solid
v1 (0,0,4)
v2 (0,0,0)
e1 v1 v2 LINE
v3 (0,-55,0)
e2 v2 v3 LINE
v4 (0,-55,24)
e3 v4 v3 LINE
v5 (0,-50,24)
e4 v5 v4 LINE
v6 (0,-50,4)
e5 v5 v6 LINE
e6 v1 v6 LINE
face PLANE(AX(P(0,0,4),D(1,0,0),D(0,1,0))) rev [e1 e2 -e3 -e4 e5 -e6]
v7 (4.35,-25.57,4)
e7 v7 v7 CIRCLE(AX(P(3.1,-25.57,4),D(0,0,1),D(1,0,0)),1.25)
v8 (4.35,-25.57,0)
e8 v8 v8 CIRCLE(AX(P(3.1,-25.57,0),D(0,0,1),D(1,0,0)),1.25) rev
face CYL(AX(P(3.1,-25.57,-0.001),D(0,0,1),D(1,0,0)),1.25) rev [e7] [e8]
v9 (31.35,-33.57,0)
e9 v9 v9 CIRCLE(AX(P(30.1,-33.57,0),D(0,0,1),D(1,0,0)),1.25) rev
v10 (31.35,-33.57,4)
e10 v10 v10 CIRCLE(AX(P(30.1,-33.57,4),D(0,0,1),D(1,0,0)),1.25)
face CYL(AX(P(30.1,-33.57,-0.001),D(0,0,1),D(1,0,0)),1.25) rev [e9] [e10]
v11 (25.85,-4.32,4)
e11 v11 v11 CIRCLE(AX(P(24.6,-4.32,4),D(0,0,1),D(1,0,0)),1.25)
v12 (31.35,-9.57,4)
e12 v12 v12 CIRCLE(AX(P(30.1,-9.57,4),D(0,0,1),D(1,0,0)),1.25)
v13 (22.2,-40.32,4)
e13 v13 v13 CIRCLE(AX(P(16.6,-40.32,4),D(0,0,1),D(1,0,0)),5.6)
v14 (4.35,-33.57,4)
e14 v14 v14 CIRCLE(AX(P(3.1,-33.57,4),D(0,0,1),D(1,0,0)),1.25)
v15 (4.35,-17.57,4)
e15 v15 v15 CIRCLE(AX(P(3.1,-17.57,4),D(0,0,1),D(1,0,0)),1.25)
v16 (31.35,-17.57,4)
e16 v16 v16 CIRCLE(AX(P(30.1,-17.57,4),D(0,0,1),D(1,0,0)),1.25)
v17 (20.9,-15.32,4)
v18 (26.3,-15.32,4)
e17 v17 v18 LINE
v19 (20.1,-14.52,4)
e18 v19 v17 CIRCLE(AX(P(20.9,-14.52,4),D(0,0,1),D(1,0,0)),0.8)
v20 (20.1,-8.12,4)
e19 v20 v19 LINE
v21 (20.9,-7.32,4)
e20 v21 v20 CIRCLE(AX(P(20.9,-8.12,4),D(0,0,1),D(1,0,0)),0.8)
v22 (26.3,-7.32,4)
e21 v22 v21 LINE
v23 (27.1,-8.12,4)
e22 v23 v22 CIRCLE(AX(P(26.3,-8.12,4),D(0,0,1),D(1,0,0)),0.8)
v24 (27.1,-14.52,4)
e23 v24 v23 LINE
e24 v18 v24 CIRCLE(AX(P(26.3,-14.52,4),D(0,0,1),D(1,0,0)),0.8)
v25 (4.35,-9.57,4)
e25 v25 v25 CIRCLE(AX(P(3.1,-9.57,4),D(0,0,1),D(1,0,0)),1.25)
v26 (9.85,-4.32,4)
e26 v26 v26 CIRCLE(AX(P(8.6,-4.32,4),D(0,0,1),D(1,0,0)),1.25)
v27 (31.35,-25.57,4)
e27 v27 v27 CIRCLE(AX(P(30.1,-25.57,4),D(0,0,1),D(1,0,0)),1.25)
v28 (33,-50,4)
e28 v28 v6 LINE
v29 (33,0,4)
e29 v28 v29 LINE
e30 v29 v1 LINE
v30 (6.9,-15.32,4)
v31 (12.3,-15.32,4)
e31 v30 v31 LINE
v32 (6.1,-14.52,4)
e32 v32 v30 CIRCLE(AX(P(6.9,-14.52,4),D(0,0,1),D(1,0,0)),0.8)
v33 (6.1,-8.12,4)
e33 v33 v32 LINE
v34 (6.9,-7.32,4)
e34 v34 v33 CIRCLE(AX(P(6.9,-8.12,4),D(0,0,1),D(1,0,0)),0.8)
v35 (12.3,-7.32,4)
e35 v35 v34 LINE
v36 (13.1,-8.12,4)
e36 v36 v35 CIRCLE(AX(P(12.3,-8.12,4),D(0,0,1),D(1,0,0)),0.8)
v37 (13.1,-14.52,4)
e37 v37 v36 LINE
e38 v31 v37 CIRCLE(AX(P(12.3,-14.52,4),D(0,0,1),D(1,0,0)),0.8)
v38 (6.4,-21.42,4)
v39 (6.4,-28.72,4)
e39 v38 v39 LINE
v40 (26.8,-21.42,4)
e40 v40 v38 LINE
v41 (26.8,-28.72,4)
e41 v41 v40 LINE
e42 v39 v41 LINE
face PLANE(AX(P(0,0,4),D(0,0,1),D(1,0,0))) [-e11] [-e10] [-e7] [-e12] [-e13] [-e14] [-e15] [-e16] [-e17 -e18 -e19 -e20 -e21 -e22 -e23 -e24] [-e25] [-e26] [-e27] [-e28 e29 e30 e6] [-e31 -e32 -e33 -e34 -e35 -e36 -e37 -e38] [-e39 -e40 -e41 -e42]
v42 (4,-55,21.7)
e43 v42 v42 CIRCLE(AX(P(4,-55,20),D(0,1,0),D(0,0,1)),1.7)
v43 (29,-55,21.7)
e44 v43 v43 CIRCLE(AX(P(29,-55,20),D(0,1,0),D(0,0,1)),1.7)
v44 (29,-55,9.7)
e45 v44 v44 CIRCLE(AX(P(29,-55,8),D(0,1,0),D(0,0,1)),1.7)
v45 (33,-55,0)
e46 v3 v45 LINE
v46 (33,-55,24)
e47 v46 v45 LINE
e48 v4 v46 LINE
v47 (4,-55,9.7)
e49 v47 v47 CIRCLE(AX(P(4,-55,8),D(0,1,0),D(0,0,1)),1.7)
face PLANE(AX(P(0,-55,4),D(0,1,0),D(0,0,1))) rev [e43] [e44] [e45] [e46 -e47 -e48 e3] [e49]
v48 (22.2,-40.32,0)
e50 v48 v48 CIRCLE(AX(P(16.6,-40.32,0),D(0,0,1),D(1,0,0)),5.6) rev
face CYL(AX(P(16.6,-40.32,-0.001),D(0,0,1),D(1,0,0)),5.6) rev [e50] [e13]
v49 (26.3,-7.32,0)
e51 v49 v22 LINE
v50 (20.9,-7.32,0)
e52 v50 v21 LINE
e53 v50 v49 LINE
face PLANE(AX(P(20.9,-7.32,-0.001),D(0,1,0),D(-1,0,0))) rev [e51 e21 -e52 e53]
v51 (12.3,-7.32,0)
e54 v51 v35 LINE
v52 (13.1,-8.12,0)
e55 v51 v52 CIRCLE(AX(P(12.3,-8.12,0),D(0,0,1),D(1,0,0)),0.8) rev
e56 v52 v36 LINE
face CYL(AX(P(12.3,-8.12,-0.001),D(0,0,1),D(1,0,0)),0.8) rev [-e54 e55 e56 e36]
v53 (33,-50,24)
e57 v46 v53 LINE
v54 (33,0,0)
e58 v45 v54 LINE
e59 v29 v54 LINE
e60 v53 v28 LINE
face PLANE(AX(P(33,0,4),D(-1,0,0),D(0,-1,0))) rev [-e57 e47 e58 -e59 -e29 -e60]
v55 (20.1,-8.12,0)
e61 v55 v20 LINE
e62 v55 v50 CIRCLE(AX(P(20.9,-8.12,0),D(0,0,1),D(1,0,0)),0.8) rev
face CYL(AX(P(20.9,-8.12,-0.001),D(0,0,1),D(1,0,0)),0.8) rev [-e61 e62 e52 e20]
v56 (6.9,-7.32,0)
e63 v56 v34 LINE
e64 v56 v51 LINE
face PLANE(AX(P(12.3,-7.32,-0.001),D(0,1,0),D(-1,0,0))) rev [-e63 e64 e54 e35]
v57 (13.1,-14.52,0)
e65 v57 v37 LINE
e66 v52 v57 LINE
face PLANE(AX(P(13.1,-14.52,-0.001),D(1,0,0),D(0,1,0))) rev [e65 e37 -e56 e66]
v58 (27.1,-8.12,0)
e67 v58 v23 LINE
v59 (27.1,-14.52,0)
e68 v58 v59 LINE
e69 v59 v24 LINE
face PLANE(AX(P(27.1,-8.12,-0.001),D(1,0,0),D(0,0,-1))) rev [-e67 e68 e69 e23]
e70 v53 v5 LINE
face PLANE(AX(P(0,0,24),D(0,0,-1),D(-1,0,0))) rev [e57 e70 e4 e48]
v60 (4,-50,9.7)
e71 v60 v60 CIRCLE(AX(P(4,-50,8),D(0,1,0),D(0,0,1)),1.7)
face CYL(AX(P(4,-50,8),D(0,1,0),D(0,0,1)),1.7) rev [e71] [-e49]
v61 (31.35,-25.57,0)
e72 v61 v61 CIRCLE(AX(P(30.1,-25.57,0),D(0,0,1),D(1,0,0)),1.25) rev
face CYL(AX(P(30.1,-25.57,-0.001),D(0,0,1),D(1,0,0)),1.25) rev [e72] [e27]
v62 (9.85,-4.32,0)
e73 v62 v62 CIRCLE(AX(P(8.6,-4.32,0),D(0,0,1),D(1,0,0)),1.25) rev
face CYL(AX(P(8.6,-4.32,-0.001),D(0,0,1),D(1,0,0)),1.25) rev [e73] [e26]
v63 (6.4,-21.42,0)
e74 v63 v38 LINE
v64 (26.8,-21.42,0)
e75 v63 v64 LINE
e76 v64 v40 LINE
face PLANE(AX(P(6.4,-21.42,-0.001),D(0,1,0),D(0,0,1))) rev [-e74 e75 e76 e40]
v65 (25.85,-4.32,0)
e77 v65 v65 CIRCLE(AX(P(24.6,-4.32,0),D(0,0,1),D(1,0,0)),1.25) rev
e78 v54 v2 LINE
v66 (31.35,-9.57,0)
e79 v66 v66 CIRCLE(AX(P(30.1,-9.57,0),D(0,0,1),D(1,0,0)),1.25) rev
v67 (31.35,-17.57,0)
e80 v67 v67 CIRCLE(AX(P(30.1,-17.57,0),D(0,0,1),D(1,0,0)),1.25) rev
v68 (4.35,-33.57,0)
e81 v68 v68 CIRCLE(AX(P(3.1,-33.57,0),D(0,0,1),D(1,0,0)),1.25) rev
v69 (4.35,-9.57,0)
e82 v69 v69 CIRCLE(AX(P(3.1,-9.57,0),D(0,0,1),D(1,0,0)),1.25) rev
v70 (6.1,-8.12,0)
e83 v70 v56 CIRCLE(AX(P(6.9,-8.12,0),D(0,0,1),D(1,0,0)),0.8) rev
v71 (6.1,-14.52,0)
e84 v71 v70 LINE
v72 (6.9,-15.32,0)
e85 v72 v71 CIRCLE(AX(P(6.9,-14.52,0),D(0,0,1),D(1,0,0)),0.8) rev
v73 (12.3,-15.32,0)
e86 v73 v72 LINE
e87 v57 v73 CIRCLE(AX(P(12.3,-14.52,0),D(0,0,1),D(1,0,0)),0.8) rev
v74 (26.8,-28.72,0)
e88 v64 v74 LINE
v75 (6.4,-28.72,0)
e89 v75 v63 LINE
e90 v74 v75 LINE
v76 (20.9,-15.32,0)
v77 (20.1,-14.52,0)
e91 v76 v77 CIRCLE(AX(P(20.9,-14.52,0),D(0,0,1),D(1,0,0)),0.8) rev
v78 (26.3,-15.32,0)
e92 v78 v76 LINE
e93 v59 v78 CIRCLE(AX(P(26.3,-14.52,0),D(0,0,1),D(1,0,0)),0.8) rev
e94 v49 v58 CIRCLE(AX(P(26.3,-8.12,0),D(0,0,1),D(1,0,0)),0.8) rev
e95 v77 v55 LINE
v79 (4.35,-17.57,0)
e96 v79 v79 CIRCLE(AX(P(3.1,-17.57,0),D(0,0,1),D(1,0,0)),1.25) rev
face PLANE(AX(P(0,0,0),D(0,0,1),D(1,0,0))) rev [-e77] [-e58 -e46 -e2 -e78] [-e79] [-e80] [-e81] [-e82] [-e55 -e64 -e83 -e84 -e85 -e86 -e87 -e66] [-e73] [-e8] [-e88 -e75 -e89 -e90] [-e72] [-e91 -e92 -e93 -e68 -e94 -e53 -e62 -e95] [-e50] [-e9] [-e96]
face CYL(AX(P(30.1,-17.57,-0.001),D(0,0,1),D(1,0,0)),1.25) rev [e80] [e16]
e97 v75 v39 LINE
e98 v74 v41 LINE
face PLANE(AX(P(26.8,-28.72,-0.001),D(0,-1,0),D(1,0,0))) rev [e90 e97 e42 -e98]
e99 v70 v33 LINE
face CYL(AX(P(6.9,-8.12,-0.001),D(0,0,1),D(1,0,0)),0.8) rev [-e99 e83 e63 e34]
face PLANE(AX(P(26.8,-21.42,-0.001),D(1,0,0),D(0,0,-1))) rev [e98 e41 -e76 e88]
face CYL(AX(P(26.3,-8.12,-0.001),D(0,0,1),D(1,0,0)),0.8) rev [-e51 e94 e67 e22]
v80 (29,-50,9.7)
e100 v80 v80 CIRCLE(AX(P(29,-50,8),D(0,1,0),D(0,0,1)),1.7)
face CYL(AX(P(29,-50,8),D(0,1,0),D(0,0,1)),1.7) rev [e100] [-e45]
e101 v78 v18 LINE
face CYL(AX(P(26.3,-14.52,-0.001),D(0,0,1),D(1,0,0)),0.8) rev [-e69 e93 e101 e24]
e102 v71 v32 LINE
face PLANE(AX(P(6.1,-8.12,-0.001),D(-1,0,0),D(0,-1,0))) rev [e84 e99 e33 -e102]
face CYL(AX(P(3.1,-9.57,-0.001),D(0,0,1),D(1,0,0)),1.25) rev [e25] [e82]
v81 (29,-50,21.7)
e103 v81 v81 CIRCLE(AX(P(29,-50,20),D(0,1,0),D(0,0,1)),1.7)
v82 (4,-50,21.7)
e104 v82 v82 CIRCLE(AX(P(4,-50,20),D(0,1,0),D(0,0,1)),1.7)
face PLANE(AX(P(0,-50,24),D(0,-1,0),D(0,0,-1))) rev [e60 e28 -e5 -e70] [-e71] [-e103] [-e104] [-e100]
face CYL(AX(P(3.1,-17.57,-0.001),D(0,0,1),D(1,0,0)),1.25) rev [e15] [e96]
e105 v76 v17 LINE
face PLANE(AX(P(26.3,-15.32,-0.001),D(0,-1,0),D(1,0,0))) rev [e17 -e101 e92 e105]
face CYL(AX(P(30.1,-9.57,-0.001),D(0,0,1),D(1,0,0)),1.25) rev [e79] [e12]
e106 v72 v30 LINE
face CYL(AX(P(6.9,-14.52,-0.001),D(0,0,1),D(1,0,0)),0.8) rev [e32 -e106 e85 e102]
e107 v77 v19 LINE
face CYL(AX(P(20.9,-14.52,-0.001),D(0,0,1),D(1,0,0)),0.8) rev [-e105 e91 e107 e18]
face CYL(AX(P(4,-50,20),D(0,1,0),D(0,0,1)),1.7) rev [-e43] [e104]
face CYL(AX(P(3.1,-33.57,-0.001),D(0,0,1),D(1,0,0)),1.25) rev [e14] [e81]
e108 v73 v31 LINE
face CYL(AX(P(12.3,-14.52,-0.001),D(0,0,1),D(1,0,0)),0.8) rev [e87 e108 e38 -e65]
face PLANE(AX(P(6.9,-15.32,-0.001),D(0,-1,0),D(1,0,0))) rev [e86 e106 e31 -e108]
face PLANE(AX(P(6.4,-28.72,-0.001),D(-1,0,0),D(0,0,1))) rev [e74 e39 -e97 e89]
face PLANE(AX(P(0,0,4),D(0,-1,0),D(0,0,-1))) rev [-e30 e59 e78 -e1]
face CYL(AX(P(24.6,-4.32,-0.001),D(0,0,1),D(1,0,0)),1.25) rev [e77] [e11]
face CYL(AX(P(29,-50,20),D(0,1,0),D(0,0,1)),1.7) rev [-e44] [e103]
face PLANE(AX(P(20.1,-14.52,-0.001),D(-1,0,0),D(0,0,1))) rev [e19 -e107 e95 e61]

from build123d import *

# Parameters (mm, degrees)
SKETCH1_W                    = 33
SKETCH1_H                    = 55
BOSS_EXTRUDE1_DEPTH          = 4
SKETCH2_W                    = 33
SKETCH2_H                    = 5
BOSS_EXTRUDE2_DEPTH          = 20
CUT_EXTRUDE1_REACH           = 69.186
SKETCH3_R                    = 1.25
SKETCH3_R_2                  = 5.6
M3_START                     = -55
M3_CLEARANCE_HOLE1_OUTLINE_R = 1.7
M3_CLEARANCE_HOLE1_DEPTH     = 5


# Read off the part's stored shape, not the designer's step: M3 Clearance Hole1
with BuildPart() as part:
    # Sketch1 → Boss-Extrude1 (new body)
    with BuildSketch(Plane.XY):
        with Locations((16.5, -27.5)):
            Rectangle(SKETCH1_W, SKETCH1_H)
    extrude(amount=BOSS_EXTRUDE1_DEPTH)

    # Sketch2 → Boss-Extrude2 (add)
    with BuildSketch(Plane.XY.offset(4)):
        with Locations((16.5, -52.5)):
            Rectangle(SKETCH2_W, SKETCH2_H)
    extrude(amount=BOSS_EXTRUDE2_DEPTH)

    # Sketch3 → Cut-Extrude1 (cut, up to next)
    with BuildSketch(Plane.XY.offset(4), mode=Mode.PRIVATE) as cut_extrude1_sk1:
        with Locations((30.1, -9.57)):
            Circle(SKETCH3_R)
    cut_extrude1_tool1 = extrude(cut_extrude1_sk1.sketch, amount=-CUT_EXTRUDE1_REACH, mode=Mode.PRIVATE) & part.part
    # Sketch3 → Cut-Extrude1 (cut, up to next)
    with BuildSketch(Plane.XY.offset(4), mode=Mode.PRIVATE) as cut_extrude1_sk2:
        with Locations((30.1, -17.57)):
            Circle(SKETCH3_R)
    cut_extrude1_tool2 = extrude(cut_extrude1_sk2.sketch, amount=-CUT_EXTRUDE1_REACH, mode=Mode.PRIVATE) & part.part
    # Sketch3 → Cut-Extrude1 (cut, up to next)
    with BuildSketch(Plane.XY.offset(4), mode=Mode.PRIVATE) as cut_extrude1_sk3:
        with Locations((30.1, -25.57)):
            Circle(SKETCH3_R)
    cut_extrude1_tool3 = extrude(cut_extrude1_sk3.sketch, amount=-CUT_EXTRUDE1_REACH, mode=Mode.PRIVATE) & part.part
    # Sketch3 → Cut-Extrude1 (cut, up to next)
    with BuildSketch(Plane.XY.offset(4), mode=Mode.PRIVATE) as cut_extrude1_sk4:
        with Locations((30.1, -33.57)):
            Circle(SKETCH3_R)
    cut_extrude1_tool4 = extrude(cut_extrude1_sk4.sketch, amount=-CUT_EXTRUDE1_REACH, mode=Mode.PRIVATE) & part.part
    # Sketch3 → Cut-Extrude1 (cut, up to next)
    with BuildSketch(Plane.XY.offset(4), mode=Mode.PRIVATE) as cut_extrude1_sk5:
        with Locations((3.1, -33.57)):
            Circle(SKETCH3_R)
    cut_extrude1_tool5 = extrude(cut_extrude1_sk5.sketch, amount=-CUT_EXTRUDE1_REACH, mode=Mode.PRIVATE) & part.part
    # Sketch3 → Cut-Extrude1 (cut, up to next)
    with BuildSketch(Plane.XY.offset(4), mode=Mode.PRIVATE) as cut_extrude1_sk6:
        with Locations((3.1, -25.57)):
            Circle(SKETCH3_R)
    cut_extrude1_tool6 = extrude(cut_extrude1_sk6.sketch, amount=-CUT_EXTRUDE1_REACH, mode=Mode.PRIVATE) & part.part
    # Sketch3 → Cut-Extrude1 (cut, up to next)
    with BuildSketch(Plane.XY.offset(4), mode=Mode.PRIVATE) as cut_extrude1_sk7:
        with Locations((3.1, -17.57)):
            Circle(SKETCH3_R)
    cut_extrude1_tool7 = extrude(cut_extrude1_sk7.sketch, amount=-CUT_EXTRUDE1_REACH, mode=Mode.PRIVATE) & part.part
    # Sketch3 → Cut-Extrude1 (cut, up to next)
    with BuildSketch(Plane.XY.offset(4), mode=Mode.PRIVATE) as cut_extrude1_sk8:
        with Locations((3.1, -9.57)):
            Circle(SKETCH3_R)
    cut_extrude1_tool8 = extrude(cut_extrude1_sk8.sketch, amount=-CUT_EXTRUDE1_REACH, mode=Mode.PRIVATE) & part.part
    # Sketch3 → Cut-Extrude1 (cut, up to next)
    with BuildSketch(Plane.XY.offset(4), mode=Mode.PRIVATE) as cut_extrude1_sk9:
        with Locations((8.6, -4.32)):
            Circle(SKETCH3_R)
    cut_extrude1_tool9 = extrude(cut_extrude1_sk9.sketch, amount=-CUT_EXTRUDE1_REACH, mode=Mode.PRIVATE) & part.part
    # Sketch3 → Cut-Extrude1 (cut, up to next)
    with BuildSketch(Plane.XY.offset(4), mode=Mode.PRIVATE) as cut_extrude1_sk10:
        with Locations((24.6, -4.32)):
            Circle(SKETCH3_R)
    cut_extrude1_tool10 = extrude(cut_extrude1_sk10.sketch, amount=-CUT_EXTRUDE1_REACH, mode=Mode.PRIVATE) & part.part
    # Sketch3 → Cut-Extrude1 (cut, up to next)
    with BuildSketch(Plane.XY.offset(4), mode=Mode.PRIVATE) as cut_extrude1_sk11:
        with Locations((16.6, -40.32)):
            Circle(SKETCH3_R_2)
    cut_extrude1_tool11 = extrude(cut_extrude1_sk11.sketch, amount=-CUT_EXTRUDE1_REACH, mode=Mode.PRIVATE) & part.part
    # Sketch3 → Cut-Extrude1 (cut, up to next)
    with BuildSketch(Plane.XY.offset(4), mode=Mode.PRIVATE) as cut_extrude1_sk12:
        with BuildLine():
            Line((6.9, -15.32), (12.3, -15.32))
            ThreePointArc((12.3, -15.32), (12.865685425, -15.085685425), (13.1, -14.52))
            Line((13.1, -14.52), (13.1, -8.12))
            ThreePointArc((13.1, -8.12), (12.865685425, -7.554314575), (12.3, -7.32))
            Line((12.3, -7.32), (6.9, -7.32))
            ThreePointArc((6.9, -7.32), (6.334314575, -7.554314575), (6.1, -8.12))
            Line((6.1, -8.12), (6.1, -14.52))
            ThreePointArc((6.1, -14.52), (6.334314575, -15.085685425), (6.9, -15.32))
        make_face()
    cut_extrude1_tool12 = extrude(cut_extrude1_sk12.sketch, amount=-CUT_EXTRUDE1_REACH, mode=Mode.PRIVATE) & part.part
    # Sketch3 → Cut-Extrude1 (cut, up to next)
    with BuildSketch(Plane.XY.offset(4), mode=Mode.PRIVATE) as cut_extrude1_sk13:
        with BuildLine():
            Line((27.1, -8.12), (27.1, -14.52))
            ThreePointArc((27.1, -14.52), (26.865685425, -15.085685425), (26.3, -15.32))
            Line((26.3, -15.32), (20.9, -15.32))
            ThreePointArc((20.9, -15.32), (20.334314575, -15.085685425), (20.1, -14.52))
            Line((20.1, -14.52), (20.1, -8.12))
            ThreePointArc((20.1, -8.12), (20.334314575, -7.554314575), (20.9, -7.32))
            Line((20.9, -7.32), (26.3, -7.32))
            ThreePointArc((26.3, -7.32), (26.865685425, -7.554314575), (27.1, -8.12))
        make_face()
    cut_extrude1_tool13 = extrude(cut_extrude1_sk13.sketch, amount=-CUT_EXTRUDE1_REACH, mode=Mode.PRIVATE) & part.part
    # Sketch3 → Cut-Extrude1 (cut, up to next)
    with BuildSketch(Plane.XY.offset(4), mode=Mode.PRIVATE) as cut_extrude1_sk14:
        Polygon((6.4, -21.42), (16.5, -21.42), (16.7, -21.42), (26.8, -21.42), (26.8, -28.72), (16.7, -28.72), (16.5, -28.72), (6.4, -28.72), align=None)
    cut_extrude1_tool14 = extrude(cut_extrude1_sk14.sketch, amount=-CUT_EXTRUDE1_REACH, mode=Mode.PRIVATE) & part.part
    add(cut_extrude1_tool1.solids().sort_by_distance((30.1, -9.57, 4))[0], mode=Mode.SUBTRACT)
    add(cut_extrude1_tool2.solids().sort_by_distance((30.1, -17.57, 4))[0], mode=Mode.SUBTRACT)
    add(cut_extrude1_tool3.solids().sort_by_distance((30.1, -25.57, 4))[0], mode=Mode.SUBTRACT)
    add(cut_extrude1_tool4.solids().sort_by_distance((30.1, -33.57, 4))[0], mode=Mode.SUBTRACT)
    add(cut_extrude1_tool5.solids().sort_by_distance((3.1, -33.57, 4))[0], mode=Mode.SUBTRACT)
    add(cut_extrude1_tool6.solids().sort_by_distance((3.1, -25.57, 4))[0], mode=Mode.SUBTRACT)
    add(cut_extrude1_tool7.solids().sort_by_distance((3.1, -17.57, 4))[0], mode=Mode.SUBTRACT)
    add(cut_extrude1_tool8.solids().sort_by_distance((3.1, -9.57, 4))[0], mode=Mode.SUBTRACT)
    add(cut_extrude1_tool9.solids().sort_by_distance((8.6, -4.32, 4))[0], mode=Mode.SUBTRACT)
    add(cut_extrude1_tool10.solids().sort_by_distance((24.6, -4.32, 4))[0], mode=Mode.SUBTRACT)
    add(cut_extrude1_tool11.solids().sort_by_distance((16.6, -40.32, 4))[0], mode=Mode.SUBTRACT)
    add(cut_extrude1_tool12.solids().sort_by_distance((9.6, -11.32, 4))[0], mode=Mode.SUBTRACT)
    add(cut_extrude1_tool13.solids().sort_by_distance((23.6, -11.32, 4))[0], mode=Mode.SUBTRACT)
    add(cut_extrude1_tool14.solids().sort_by_distance((16.6, -25.07, 4))[0], mode=Mode.SUBTRACT)

    # M3 Clearance Hole1 outline → M3 Clearance Hole1 (cut)
    with BuildSketch(Plane(origin=(0, 0, 0), x_dir=(1, 0, 0), z_dir=(0, 1, 0)).offset(M3_START)):
        with Locations((29, -8)):
            Circle(M3_CLEARANCE_HOLE1_OUTLINE_R)
        with Locations((4, -20)):
            Circle(M3_CLEARANCE_HOLE1_OUTLINE_R)
        with Locations((29, -20)):
            Circle(M3_CLEARANCE_HOLE1_OUTLINE_R)
        with Locations((4, -8)):
            Circle(M3_CLEARANCE_HOLE1_OUTLINE_R)
    extrude(amount=M3_CLEARANCE_HOLE1_DEPTH, mode=Mode.SUBTRACT)


solid = part.part
